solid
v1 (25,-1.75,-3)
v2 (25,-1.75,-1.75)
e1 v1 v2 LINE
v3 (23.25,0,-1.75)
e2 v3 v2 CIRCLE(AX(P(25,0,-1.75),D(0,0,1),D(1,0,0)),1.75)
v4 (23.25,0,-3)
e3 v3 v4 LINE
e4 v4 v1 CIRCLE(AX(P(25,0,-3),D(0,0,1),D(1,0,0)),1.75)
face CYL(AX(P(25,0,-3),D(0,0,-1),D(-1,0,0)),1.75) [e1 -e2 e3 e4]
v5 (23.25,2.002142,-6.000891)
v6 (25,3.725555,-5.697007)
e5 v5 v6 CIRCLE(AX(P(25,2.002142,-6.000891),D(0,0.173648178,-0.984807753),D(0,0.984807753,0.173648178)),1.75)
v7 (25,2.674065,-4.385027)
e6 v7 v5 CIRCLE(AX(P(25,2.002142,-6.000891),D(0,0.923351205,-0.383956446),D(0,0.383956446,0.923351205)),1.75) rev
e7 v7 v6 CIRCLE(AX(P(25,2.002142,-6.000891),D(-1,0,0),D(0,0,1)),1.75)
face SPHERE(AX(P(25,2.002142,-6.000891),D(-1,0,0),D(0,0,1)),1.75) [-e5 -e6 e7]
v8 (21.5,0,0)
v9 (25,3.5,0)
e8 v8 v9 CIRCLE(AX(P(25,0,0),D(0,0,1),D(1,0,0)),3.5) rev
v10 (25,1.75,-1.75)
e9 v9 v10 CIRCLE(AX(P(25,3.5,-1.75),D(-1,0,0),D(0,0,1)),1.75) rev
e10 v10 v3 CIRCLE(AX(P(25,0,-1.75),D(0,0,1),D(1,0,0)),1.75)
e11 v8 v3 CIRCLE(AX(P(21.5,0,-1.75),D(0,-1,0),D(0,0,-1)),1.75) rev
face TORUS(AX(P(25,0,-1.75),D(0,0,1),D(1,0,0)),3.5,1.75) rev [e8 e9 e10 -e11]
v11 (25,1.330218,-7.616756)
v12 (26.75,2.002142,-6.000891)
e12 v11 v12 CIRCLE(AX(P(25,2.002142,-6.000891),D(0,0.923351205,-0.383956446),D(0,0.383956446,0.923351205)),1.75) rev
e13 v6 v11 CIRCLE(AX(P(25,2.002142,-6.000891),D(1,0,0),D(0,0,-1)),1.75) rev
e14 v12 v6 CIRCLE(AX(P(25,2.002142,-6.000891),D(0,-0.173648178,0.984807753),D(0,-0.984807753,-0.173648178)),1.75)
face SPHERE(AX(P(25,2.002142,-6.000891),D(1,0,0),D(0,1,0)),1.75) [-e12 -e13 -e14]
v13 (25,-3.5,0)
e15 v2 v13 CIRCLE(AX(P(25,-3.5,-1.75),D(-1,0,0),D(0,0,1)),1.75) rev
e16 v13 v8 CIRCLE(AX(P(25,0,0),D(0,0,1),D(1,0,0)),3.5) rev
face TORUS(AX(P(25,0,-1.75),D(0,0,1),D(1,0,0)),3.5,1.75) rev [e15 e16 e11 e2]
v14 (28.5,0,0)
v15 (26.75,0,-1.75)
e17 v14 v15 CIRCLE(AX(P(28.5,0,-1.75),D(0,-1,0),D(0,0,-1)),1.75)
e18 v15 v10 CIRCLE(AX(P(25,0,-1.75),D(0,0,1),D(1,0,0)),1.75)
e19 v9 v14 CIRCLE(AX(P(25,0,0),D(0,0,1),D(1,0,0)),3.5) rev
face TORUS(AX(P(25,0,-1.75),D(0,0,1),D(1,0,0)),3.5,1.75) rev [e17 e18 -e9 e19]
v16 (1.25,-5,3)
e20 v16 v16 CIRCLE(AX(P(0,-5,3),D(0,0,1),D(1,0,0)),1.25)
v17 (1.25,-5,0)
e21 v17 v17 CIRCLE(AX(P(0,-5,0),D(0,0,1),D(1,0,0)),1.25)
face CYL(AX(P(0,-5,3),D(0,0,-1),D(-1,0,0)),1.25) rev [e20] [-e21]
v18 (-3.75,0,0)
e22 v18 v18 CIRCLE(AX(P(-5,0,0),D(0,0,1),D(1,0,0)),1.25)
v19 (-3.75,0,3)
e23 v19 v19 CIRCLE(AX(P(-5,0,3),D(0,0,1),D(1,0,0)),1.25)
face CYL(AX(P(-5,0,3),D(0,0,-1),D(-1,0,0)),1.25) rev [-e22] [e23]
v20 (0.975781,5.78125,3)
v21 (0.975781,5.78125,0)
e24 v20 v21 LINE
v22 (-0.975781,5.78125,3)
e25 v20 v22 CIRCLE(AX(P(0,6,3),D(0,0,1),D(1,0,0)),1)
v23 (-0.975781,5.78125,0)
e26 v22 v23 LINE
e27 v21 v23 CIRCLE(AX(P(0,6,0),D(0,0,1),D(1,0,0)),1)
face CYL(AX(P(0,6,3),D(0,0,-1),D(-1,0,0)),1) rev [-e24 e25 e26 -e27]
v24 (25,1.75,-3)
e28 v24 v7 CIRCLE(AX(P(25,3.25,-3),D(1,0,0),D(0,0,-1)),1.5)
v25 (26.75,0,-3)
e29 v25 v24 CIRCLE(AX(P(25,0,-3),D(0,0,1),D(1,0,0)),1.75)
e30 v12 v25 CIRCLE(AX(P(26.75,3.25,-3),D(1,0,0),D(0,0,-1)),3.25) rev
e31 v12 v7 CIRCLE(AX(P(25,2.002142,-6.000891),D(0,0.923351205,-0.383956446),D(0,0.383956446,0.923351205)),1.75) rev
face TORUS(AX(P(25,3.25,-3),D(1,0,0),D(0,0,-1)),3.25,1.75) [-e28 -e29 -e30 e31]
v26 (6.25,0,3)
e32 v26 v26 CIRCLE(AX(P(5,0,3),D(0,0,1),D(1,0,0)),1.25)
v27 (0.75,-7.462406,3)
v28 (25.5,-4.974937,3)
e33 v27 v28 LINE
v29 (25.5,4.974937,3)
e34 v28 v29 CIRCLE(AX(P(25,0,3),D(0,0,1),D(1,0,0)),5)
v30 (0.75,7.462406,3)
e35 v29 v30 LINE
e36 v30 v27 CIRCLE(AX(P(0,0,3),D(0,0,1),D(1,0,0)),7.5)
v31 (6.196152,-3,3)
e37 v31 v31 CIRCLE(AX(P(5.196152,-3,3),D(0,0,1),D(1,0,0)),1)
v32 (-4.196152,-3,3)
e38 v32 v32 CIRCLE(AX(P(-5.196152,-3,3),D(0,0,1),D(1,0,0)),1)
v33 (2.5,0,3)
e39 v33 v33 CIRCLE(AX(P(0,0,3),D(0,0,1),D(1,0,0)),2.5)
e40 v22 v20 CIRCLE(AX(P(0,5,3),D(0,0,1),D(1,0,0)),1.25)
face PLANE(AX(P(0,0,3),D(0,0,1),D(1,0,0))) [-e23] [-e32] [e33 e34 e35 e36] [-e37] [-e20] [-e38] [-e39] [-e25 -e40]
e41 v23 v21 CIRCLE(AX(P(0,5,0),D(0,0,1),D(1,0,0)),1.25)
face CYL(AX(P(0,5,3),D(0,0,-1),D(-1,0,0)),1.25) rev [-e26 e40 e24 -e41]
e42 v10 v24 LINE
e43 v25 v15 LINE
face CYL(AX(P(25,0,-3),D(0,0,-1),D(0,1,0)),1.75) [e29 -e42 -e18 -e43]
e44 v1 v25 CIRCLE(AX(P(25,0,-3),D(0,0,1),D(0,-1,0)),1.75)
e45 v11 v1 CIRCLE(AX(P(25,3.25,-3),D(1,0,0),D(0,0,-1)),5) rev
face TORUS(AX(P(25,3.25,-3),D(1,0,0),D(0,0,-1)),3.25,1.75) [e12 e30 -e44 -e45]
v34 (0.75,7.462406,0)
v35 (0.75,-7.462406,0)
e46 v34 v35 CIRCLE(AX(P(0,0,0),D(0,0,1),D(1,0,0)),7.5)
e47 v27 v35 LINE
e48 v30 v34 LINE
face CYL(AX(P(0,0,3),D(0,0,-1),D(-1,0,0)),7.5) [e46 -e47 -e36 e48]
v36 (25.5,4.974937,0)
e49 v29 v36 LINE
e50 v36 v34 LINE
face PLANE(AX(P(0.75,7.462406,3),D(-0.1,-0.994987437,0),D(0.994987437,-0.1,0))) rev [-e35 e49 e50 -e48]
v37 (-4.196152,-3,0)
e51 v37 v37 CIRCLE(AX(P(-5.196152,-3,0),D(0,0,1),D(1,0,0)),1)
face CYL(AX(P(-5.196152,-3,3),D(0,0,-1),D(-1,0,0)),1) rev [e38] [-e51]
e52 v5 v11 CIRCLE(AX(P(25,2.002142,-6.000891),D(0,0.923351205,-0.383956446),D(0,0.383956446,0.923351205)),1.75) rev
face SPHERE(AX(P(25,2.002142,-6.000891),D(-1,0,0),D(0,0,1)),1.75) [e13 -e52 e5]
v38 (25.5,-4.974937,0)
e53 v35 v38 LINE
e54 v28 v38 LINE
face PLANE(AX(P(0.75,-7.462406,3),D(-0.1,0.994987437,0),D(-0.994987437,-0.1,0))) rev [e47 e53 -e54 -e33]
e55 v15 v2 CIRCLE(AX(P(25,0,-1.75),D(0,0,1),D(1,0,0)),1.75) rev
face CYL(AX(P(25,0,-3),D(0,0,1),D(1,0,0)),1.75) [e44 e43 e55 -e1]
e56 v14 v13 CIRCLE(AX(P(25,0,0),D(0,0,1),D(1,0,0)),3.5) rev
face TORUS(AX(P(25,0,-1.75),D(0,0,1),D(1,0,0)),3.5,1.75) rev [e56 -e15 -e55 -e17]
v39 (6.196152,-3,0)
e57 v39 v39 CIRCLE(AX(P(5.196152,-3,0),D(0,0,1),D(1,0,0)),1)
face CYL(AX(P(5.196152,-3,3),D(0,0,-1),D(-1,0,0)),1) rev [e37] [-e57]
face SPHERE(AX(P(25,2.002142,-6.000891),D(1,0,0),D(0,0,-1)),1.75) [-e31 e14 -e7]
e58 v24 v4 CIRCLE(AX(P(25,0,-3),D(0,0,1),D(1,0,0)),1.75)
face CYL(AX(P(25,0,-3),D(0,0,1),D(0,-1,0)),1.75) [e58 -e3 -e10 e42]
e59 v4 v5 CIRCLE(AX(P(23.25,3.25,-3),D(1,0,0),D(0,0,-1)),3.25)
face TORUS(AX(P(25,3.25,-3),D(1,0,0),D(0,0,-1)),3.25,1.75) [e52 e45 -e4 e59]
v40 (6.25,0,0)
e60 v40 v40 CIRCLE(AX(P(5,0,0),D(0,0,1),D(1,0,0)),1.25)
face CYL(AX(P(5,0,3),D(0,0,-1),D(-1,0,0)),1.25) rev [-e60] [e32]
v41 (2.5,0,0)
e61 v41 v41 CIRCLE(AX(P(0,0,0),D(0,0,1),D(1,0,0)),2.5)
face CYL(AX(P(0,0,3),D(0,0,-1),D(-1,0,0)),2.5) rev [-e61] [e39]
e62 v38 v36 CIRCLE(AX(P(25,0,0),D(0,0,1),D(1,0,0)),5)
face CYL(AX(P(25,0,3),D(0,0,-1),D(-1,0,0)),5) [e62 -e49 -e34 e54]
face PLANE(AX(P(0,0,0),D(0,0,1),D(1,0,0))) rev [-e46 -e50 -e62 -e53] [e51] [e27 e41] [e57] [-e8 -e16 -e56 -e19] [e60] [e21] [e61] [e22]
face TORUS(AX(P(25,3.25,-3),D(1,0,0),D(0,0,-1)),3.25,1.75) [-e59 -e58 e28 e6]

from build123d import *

# Parameters (mm, degrees)
SKETCH_1_R      = 1.25
SKETCH_1_R_2    = 2.5
SKETCH_1_R_3    = 1
EXTRUDE_1_DEPTH = 3
EXTRUDE_2_DEPTH = 1.75
FILLET_1_R      = 1.75


with BuildPart() as part:
    # 草图1 → 凸台-拉伸1 (new body)
    with BuildSketch(Plane.XY):
        with BuildLine():
            Line((0.75, 7.462405778), (25.5, 4.974937186))
            ThreePointArc((25.5, 4.974937186), (30, 0), (25.5, -4.974937186))
            Line((25.5, -4.974937186), (0.75, -7.462405778))
            ThreePointArc((0.75, -7.462405778), (-7.5, 0), (0.75, 7.462405778))
        make_face()
        with Locations((5, 0)):
            Circle(SKETCH_1_R, mode=Mode.SUBTRACT)
        with Locations((0, -5)):
            Circle(SKETCH_1_R, mode=Mode.SUBTRACT)
        with Locations((-5, 0)):
            Circle(SKETCH_1_R, mode=Mode.SUBTRACT)
        Circle(SKETCH_1_R_2, mode=Mode.SUBTRACT)
        with Locations((5.196152423, -3)):
            Circle(SKETCH_1_R_3, mode=Mode.SUBTRACT)
        with Locations((-5.196152423, -3)):
            Circle(SKETCH_1_R_3, mode=Mode.SUBTRACT)
        with BuildLine():
            ThreePointArc((-0.975780937, 5.78125), (0, 3.75), (0.975780937, 5.78125))
            ThreePointArc((0.975780937, 5.78125), (0, 7), (-0.975780937, 5.78125))
        make_face(mode=Mode.SUBTRACT)
    extrude(amount=EXTRUDE_1_DEPTH)

    # 草图2 → 凸台-拉伸2 (add, symmetric)
    with BuildSketch(Plane(origin=(25, 0, 0), x_dir=(0, 0, -1), z_dir=(1, 0, 0))):
        with BuildLine():
            Line((3, -1.75), (0, -1.75))
            Line((0, -1.75), (0, 1.75))
            Line((0, 1.75), (3, 1.75))
            ThreePointArc((3, 1.75), (4.149066665, 2.285818585), (4.47721163, 3.510472267))
            Line((4.47721163, 3.510472267), (7.924038765, 4.118240888))
            ThreePointArc((7.924038765, 4.118240888), (6.830222216, 0.036061952), (3, -1.75))
        make_face()
    extrude(amount=EXTRUDE_2_DEPTH, both=True)

    # 圆角1
    fillet_1_edges = [part.edges().sort_by_distance(p)[0] for p in [
        (23.25, 0, 0),
        (25, 1.75, 0),
        (23.25, -1.75, -1.5),
        (25, -1.75, 0),
        (23.25, 0.036061952, -6.830222216),
        (25, -1.75, -3),
        (23.25, 3.814356577, -6.200625197),
        (25, 4.118240888, -7.924038765),
        (23.25, 2.285818585, -4.149066665),
        (25, 3.510472267, -4.47721163),
        (23.25, 1.75, -1.5),
        (25, 1.75, -3),
        (26.75, 0, 0),
        (26.75, -1.75, -1.5),
        (26.75, 0.036061952, -6.830222216),
        (26.75, 3.814356577, -6.200625197),
        (26.75, 2.285818585, -4.149066665),
        (26.75, 1.75, -1.5),
    ]]
    fillet(fillet_1_edges, radius=FILLET_1_R - 0.0001)  # a hair under: the kernel refuses the full size


solid = part.part
